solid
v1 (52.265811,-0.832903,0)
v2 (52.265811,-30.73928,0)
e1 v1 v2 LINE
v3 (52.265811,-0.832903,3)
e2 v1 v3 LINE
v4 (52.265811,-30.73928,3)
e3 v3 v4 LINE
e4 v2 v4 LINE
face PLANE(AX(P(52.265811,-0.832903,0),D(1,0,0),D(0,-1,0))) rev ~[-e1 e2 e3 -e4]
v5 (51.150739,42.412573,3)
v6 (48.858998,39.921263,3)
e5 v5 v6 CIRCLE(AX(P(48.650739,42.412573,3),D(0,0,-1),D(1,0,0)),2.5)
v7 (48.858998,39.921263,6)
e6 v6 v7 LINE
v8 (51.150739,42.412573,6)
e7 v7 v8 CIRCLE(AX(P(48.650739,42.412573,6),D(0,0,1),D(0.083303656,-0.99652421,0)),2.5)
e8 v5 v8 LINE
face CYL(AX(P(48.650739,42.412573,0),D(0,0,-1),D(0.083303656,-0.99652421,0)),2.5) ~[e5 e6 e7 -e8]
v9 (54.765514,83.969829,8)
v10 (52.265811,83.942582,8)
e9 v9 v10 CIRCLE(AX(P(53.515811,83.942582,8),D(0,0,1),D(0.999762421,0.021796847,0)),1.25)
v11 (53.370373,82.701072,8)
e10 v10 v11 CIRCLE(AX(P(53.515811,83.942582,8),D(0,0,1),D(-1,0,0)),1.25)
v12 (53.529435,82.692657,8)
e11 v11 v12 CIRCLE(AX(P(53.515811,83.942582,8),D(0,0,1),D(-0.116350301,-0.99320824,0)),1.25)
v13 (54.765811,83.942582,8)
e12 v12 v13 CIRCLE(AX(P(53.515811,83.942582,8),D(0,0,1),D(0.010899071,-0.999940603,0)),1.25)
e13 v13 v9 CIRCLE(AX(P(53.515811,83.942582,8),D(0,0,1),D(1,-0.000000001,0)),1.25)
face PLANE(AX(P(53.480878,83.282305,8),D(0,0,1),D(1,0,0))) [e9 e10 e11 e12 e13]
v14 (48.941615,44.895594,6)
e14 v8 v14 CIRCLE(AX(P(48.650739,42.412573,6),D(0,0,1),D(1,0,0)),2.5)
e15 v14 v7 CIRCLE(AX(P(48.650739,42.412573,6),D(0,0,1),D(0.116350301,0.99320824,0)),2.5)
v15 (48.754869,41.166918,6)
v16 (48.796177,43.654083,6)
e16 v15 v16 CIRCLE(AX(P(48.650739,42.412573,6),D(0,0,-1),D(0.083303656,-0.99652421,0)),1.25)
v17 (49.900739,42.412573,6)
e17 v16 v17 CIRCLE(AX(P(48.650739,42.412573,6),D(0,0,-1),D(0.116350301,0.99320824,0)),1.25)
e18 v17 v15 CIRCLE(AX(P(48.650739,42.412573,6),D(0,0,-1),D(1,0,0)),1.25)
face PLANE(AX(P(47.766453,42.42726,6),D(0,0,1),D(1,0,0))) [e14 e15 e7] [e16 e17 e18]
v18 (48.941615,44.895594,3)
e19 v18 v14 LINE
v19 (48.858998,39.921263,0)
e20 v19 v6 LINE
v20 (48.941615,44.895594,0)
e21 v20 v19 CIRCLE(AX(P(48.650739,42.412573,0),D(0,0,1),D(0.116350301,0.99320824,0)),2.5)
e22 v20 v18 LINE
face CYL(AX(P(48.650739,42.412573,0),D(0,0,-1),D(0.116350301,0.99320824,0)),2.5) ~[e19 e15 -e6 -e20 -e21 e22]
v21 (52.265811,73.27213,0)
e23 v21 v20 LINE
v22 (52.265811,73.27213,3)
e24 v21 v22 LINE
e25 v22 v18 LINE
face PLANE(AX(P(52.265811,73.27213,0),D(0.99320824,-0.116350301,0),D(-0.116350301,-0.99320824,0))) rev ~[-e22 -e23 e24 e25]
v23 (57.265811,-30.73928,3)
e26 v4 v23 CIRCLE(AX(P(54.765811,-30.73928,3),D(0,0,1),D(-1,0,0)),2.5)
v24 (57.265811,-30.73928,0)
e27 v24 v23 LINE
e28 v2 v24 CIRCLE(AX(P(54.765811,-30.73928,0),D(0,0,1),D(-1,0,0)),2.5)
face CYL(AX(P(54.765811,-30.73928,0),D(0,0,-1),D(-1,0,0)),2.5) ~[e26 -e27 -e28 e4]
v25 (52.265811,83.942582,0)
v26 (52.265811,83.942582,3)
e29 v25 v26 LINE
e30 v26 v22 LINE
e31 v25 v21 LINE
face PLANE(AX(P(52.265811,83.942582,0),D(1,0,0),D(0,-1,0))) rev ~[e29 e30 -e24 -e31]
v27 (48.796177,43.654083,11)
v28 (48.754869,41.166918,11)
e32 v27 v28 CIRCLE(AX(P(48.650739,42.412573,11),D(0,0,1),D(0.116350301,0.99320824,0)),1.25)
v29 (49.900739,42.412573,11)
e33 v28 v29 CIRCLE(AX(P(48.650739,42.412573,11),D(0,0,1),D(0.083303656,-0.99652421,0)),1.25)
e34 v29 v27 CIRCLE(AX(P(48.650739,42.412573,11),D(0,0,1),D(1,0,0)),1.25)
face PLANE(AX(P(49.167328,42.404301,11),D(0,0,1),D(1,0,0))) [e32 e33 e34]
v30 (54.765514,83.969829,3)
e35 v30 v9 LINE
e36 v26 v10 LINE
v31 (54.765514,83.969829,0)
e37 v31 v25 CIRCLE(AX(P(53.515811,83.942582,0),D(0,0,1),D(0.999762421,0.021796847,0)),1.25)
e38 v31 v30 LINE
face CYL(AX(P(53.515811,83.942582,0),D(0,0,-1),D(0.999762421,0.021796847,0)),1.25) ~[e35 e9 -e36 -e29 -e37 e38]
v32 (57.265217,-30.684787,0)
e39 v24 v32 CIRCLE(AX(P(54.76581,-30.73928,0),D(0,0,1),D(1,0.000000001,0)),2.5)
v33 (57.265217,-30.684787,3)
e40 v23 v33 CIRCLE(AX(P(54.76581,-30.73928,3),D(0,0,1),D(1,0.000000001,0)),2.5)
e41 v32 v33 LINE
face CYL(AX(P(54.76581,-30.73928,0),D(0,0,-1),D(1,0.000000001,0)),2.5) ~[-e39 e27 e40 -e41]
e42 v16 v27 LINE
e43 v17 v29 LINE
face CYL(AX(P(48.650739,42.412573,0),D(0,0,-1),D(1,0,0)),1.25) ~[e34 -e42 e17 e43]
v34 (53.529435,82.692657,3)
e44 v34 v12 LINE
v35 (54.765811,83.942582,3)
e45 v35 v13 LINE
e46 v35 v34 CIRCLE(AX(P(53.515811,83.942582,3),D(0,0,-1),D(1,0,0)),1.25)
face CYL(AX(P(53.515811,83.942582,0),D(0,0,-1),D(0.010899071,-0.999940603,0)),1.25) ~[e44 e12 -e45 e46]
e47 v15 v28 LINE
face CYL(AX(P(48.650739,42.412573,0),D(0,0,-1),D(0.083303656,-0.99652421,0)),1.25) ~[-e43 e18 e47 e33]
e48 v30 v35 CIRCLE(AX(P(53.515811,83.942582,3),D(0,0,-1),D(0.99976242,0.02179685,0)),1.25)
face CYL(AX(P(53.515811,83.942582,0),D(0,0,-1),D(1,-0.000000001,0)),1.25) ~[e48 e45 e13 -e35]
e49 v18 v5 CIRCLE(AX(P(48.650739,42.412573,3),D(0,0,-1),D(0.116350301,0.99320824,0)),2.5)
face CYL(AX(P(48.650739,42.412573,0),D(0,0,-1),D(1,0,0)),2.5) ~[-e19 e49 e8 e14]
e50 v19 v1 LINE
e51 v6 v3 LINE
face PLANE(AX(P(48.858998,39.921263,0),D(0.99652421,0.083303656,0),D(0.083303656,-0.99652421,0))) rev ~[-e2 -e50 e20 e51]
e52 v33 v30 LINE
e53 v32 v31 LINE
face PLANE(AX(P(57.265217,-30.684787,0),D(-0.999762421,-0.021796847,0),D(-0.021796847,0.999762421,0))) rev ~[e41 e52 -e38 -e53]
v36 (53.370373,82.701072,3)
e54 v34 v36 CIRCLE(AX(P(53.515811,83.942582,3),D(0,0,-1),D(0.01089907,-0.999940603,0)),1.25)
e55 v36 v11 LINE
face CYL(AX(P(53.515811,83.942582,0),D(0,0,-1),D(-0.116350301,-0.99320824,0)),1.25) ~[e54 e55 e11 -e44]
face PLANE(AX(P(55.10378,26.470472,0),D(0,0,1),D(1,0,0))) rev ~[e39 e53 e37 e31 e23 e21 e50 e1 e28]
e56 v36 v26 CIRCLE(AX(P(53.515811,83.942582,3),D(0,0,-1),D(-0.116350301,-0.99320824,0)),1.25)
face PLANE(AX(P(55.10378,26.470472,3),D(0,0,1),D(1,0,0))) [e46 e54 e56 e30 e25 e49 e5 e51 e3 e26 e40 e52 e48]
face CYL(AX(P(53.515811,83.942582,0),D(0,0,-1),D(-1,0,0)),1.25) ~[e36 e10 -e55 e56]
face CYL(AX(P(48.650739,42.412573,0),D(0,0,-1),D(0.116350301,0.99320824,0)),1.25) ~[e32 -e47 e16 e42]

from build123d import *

# Parameters (mm, degrees)
F1_DEPTH = 6
F2_DEPTH = 11
F3_DEPTH = 8
F4_DEPTH = 3


# Not quite as in the source:
# - a feature names something its author has since deleted; it is built from what else it names


with BuildPart() as f1:
    # F0 (on Top) → F1 (new body)
    with BuildSketch(Plane.XY):
        with BuildLine():
            Line((48.7961772168, 43.654083433), (48.941615093, 44.8955937326))
            ThreePointArc((48.941615093, 44.8955937326), (46.1510840758, 42.4540888757), (48.8589984809, 39.9212626086))
            Line((48.8589984809, 39.9212626086), (48.7548689108, 41.1669178709))
            ThreePointArc((48.7548689108, 41.1669178709), (47.4009117082, 42.4333310045), (48.7961772168, 43.654083433))
        make_face()
        with BuildLine():
            ThreePointArc((51.1507393406, 42.4125731333), (50.5185173495, 44.0743208005), (48.941615093, 44.8955937326))
            Line((48.941615093, 44.8955937326), (48.7961772168, 43.654083433))
            ThreePointArc((48.7961772168, 43.654083433), (49.5846283451, 43.2434469669), (49.9007393406, 42.4125731333))
            ThreePointArc((49.9007393406, 42.4125731333), (49.5707018297, 41.5663054341), (48.7548689108, 41.1669178709))
            Line((48.7548689108, 41.1669178709), (48.8589984809, 39.9212626086))
            ThreePointArc((48.8589984809, 39.9212626086), (50.4906643188, 40.7200377349), (51.1507393406, 42.4125731333))
        make_face()
    extrude(amount=F1_DEPTH)

    # F0 (on Top) → F2 (join)
    with BuildSketch(Plane.XY):
        with BuildLine():
            ThreePointArc((49.9007393406, 42.4125731333), (49.5846283451, 43.2434469669), (48.7961772168, 43.654083433))
            Line((48.7961772168, 43.654083433), (48.6507393406, 42.4125731333))
            Line((48.6507393406, 42.4125731333), (48.7548689108, 41.1669178709))
            ThreePointArc((48.7548689108, 41.1669178709), (49.5707018297, 41.5663054341), (49.9007393406, 42.4125731333))
        make_face()
        with BuildLine():
            Line((48.6507393406, 42.4125731333), (48.7961772168, 43.654083433))
            ThreePointArc((48.7961772168, 43.654083433), (47.4009117082, 42.4333310045), (48.7548689108, 41.1669178709))
            Line((48.7548689108, 41.1669178709), (48.6507393406, 42.4125731333))
        make_face()
    extrude(amount=F2_DEPTH)



with BuildPart() as f3:
    # F0 (on Top) → F3 (new body)
    with BuildSketch(Plane.XY):
        with BuildLine():
            Line((53.5294346637, 82.6926567151), (53.515810825, 83.9425824693))
            Line((53.515810825, 83.9425824693), (53.3703729488, 82.7010721697))
            ThreePointArc((53.3703729488, 82.7010721697), (53.4497696251, 82.6943282645), (53.5294346637, 82.6926567151))
        make_face()
        with BuildLine():
            Line((53.3703729488, 82.7010721697), (53.515810825, 83.9425824693))
            Line((53.515810825, 83.9425824693), (53.5294346637, 82.6926567151))
            ThreePointArc((53.5294346637, 82.6926567151), (54.4044980024, 83.0635289438), (54.765810825, 83.9425824693))
            ThreePointArc((54.765810825, 83.9425824693), (54.7657365792, 83.9562063081), (54.7655138506, 83.9698285284))
            ThreePointArc((54.7655138506, 83.9698285284), (53.5021869863, 85.1925082235), (52.265810825, 83.9425824693))
            ThreePointArc((52.265810825, 83.9425824693), (52.5819218206, 83.1117086357), (53.3703729488, 82.7010721697))
        make_face()
    extrude(amount=F3_DEPTH)


with BuildPart() as f1_1:
    add(f1.part)

    add(f3.part)  # F4 merges F3
    # F0 (on Top) → F4 (join)
    with BuildSketch(Plane.XY):
        with BuildLine():
            ThreePointArc((54.765810825, 83.9425824693), (54.4044980024, 83.0635289438), (53.5294346637, 82.6926567151))
            Line((53.5294346637, 82.6926567151), (54.7385631476, -28.239428033))
            ThreePointArc((54.7385631476, -28.239428033), (56.5044417212, -28.9428490232), (57.2652168763, -30.6847874233))
            Line((57.2652168763, -30.6847874233), (54.7655138506, 83.9698285284))
            ThreePointArc((54.7655138506, 83.9698285284), (54.7657365792, 83.9562063081), (54.765810825, 83.9425824693))
        make_face()
        with BuildLine():
            Line((54.7385631476, -28.239428033), (53.5294346637, 82.6926567151))
            ThreePointArc((53.5294346637, 82.6926567151), (53.4497696251, 82.6943282645), (53.3703729488, 82.7010721697))
            Line((53.3703729488, 82.7010721697), (52.265810825, 73.2721304859))
            Line((52.265810825, 73.2721304859), (52.265810825, -0.8329027879))
            Line((52.265810825, -0.8329027879), (54.5575516847, -28.2479690167))
            ThreePointArc((54.5575516847, -28.2479690167), (54.6479800039, -28.2420579057), (54.7385631476, -28.239428033))
        make_face()
        with BuildLine():
            Line((52.265810825, 73.2721304859), (53.3703729488, 82.7010721697))
            ThreePointArc((53.3703729488, 82.7010721697), (52.5819218206, 83.1117086357), (52.265810825, 83.9425824693))
            Line((52.265810825, 83.9425824693), (52.265810825, 73.2721304859))
        make_face()
        with BuildLine():
            ThreePointArc((57.2652168763, -30.6847874233), (56.5044417212, -28.9428490232), (54.7385631476, -28.239428033))
            Line((54.7385631476, -28.239428033), (54.765810825, -30.7392795414))
            Line((54.765810825, -30.7392795414), (54.5575516847, -28.2479690167))
            ThreePointArc((54.5575516847, -28.2479690167), (52.9258858468, -29.0467441431), (52.265810825, -30.7392795414))
            ThreePointArc((52.265810825, -30.7392795414), (54.765810825, -33.2392795414), (57.265810825, -30.7392795414))
            ThreePointArc((57.265810825, -30.7392795414), (57.2656623334, -30.712031864), (57.2652168763, -30.6847874233))
        make_face()
        with BuildLine():
            Line((54.765810825, -30.7392795414), (54.7385631476, -28.239428033))
            ThreePointArc((54.7385631476, -28.239428033), (54.6479800039, -28.2420579057), (54.5575516847, -28.2479690167))
            Line((54.5575516847, -28.2479690167), (54.765810825, -30.7392795414))
        make_face()
        with BuildLine():
            Line((52.265810825, -0.8329027879), (52.265810825, 73.2721304859))
            Line((52.265810825, 73.2721304859), (48.941615093, 44.8955937326))
            ThreePointArc((48.941615093, 44.8955937326), (50.5185173495, 44.0743208005), (51.1507393406, 42.4125731333))
            ThreePointArc((51.1507393406, 42.4125731333), (50.4906643188, 40.7200377349), (48.8589984809, 39.9212626086))
            Line((48.8589984809, 39.9212626086), (52.265810825, -0.8329027879))
        make_face()
        with BuildLine():
            ThreePointArc((52.265810825, -30.7392795414), (52.9258858468, -29.0467441431), (54.5575516847, -28.2479690167))
            Line((54.5575516847, -28.2479690167), (52.265810825, -0.8329027879))
            Line((52.265810825, -0.8329027879), (52.265810825, -30.7392795414))
        make_face()
    extrude(amount=F4_DEPTH)


solid = f1_1.part
